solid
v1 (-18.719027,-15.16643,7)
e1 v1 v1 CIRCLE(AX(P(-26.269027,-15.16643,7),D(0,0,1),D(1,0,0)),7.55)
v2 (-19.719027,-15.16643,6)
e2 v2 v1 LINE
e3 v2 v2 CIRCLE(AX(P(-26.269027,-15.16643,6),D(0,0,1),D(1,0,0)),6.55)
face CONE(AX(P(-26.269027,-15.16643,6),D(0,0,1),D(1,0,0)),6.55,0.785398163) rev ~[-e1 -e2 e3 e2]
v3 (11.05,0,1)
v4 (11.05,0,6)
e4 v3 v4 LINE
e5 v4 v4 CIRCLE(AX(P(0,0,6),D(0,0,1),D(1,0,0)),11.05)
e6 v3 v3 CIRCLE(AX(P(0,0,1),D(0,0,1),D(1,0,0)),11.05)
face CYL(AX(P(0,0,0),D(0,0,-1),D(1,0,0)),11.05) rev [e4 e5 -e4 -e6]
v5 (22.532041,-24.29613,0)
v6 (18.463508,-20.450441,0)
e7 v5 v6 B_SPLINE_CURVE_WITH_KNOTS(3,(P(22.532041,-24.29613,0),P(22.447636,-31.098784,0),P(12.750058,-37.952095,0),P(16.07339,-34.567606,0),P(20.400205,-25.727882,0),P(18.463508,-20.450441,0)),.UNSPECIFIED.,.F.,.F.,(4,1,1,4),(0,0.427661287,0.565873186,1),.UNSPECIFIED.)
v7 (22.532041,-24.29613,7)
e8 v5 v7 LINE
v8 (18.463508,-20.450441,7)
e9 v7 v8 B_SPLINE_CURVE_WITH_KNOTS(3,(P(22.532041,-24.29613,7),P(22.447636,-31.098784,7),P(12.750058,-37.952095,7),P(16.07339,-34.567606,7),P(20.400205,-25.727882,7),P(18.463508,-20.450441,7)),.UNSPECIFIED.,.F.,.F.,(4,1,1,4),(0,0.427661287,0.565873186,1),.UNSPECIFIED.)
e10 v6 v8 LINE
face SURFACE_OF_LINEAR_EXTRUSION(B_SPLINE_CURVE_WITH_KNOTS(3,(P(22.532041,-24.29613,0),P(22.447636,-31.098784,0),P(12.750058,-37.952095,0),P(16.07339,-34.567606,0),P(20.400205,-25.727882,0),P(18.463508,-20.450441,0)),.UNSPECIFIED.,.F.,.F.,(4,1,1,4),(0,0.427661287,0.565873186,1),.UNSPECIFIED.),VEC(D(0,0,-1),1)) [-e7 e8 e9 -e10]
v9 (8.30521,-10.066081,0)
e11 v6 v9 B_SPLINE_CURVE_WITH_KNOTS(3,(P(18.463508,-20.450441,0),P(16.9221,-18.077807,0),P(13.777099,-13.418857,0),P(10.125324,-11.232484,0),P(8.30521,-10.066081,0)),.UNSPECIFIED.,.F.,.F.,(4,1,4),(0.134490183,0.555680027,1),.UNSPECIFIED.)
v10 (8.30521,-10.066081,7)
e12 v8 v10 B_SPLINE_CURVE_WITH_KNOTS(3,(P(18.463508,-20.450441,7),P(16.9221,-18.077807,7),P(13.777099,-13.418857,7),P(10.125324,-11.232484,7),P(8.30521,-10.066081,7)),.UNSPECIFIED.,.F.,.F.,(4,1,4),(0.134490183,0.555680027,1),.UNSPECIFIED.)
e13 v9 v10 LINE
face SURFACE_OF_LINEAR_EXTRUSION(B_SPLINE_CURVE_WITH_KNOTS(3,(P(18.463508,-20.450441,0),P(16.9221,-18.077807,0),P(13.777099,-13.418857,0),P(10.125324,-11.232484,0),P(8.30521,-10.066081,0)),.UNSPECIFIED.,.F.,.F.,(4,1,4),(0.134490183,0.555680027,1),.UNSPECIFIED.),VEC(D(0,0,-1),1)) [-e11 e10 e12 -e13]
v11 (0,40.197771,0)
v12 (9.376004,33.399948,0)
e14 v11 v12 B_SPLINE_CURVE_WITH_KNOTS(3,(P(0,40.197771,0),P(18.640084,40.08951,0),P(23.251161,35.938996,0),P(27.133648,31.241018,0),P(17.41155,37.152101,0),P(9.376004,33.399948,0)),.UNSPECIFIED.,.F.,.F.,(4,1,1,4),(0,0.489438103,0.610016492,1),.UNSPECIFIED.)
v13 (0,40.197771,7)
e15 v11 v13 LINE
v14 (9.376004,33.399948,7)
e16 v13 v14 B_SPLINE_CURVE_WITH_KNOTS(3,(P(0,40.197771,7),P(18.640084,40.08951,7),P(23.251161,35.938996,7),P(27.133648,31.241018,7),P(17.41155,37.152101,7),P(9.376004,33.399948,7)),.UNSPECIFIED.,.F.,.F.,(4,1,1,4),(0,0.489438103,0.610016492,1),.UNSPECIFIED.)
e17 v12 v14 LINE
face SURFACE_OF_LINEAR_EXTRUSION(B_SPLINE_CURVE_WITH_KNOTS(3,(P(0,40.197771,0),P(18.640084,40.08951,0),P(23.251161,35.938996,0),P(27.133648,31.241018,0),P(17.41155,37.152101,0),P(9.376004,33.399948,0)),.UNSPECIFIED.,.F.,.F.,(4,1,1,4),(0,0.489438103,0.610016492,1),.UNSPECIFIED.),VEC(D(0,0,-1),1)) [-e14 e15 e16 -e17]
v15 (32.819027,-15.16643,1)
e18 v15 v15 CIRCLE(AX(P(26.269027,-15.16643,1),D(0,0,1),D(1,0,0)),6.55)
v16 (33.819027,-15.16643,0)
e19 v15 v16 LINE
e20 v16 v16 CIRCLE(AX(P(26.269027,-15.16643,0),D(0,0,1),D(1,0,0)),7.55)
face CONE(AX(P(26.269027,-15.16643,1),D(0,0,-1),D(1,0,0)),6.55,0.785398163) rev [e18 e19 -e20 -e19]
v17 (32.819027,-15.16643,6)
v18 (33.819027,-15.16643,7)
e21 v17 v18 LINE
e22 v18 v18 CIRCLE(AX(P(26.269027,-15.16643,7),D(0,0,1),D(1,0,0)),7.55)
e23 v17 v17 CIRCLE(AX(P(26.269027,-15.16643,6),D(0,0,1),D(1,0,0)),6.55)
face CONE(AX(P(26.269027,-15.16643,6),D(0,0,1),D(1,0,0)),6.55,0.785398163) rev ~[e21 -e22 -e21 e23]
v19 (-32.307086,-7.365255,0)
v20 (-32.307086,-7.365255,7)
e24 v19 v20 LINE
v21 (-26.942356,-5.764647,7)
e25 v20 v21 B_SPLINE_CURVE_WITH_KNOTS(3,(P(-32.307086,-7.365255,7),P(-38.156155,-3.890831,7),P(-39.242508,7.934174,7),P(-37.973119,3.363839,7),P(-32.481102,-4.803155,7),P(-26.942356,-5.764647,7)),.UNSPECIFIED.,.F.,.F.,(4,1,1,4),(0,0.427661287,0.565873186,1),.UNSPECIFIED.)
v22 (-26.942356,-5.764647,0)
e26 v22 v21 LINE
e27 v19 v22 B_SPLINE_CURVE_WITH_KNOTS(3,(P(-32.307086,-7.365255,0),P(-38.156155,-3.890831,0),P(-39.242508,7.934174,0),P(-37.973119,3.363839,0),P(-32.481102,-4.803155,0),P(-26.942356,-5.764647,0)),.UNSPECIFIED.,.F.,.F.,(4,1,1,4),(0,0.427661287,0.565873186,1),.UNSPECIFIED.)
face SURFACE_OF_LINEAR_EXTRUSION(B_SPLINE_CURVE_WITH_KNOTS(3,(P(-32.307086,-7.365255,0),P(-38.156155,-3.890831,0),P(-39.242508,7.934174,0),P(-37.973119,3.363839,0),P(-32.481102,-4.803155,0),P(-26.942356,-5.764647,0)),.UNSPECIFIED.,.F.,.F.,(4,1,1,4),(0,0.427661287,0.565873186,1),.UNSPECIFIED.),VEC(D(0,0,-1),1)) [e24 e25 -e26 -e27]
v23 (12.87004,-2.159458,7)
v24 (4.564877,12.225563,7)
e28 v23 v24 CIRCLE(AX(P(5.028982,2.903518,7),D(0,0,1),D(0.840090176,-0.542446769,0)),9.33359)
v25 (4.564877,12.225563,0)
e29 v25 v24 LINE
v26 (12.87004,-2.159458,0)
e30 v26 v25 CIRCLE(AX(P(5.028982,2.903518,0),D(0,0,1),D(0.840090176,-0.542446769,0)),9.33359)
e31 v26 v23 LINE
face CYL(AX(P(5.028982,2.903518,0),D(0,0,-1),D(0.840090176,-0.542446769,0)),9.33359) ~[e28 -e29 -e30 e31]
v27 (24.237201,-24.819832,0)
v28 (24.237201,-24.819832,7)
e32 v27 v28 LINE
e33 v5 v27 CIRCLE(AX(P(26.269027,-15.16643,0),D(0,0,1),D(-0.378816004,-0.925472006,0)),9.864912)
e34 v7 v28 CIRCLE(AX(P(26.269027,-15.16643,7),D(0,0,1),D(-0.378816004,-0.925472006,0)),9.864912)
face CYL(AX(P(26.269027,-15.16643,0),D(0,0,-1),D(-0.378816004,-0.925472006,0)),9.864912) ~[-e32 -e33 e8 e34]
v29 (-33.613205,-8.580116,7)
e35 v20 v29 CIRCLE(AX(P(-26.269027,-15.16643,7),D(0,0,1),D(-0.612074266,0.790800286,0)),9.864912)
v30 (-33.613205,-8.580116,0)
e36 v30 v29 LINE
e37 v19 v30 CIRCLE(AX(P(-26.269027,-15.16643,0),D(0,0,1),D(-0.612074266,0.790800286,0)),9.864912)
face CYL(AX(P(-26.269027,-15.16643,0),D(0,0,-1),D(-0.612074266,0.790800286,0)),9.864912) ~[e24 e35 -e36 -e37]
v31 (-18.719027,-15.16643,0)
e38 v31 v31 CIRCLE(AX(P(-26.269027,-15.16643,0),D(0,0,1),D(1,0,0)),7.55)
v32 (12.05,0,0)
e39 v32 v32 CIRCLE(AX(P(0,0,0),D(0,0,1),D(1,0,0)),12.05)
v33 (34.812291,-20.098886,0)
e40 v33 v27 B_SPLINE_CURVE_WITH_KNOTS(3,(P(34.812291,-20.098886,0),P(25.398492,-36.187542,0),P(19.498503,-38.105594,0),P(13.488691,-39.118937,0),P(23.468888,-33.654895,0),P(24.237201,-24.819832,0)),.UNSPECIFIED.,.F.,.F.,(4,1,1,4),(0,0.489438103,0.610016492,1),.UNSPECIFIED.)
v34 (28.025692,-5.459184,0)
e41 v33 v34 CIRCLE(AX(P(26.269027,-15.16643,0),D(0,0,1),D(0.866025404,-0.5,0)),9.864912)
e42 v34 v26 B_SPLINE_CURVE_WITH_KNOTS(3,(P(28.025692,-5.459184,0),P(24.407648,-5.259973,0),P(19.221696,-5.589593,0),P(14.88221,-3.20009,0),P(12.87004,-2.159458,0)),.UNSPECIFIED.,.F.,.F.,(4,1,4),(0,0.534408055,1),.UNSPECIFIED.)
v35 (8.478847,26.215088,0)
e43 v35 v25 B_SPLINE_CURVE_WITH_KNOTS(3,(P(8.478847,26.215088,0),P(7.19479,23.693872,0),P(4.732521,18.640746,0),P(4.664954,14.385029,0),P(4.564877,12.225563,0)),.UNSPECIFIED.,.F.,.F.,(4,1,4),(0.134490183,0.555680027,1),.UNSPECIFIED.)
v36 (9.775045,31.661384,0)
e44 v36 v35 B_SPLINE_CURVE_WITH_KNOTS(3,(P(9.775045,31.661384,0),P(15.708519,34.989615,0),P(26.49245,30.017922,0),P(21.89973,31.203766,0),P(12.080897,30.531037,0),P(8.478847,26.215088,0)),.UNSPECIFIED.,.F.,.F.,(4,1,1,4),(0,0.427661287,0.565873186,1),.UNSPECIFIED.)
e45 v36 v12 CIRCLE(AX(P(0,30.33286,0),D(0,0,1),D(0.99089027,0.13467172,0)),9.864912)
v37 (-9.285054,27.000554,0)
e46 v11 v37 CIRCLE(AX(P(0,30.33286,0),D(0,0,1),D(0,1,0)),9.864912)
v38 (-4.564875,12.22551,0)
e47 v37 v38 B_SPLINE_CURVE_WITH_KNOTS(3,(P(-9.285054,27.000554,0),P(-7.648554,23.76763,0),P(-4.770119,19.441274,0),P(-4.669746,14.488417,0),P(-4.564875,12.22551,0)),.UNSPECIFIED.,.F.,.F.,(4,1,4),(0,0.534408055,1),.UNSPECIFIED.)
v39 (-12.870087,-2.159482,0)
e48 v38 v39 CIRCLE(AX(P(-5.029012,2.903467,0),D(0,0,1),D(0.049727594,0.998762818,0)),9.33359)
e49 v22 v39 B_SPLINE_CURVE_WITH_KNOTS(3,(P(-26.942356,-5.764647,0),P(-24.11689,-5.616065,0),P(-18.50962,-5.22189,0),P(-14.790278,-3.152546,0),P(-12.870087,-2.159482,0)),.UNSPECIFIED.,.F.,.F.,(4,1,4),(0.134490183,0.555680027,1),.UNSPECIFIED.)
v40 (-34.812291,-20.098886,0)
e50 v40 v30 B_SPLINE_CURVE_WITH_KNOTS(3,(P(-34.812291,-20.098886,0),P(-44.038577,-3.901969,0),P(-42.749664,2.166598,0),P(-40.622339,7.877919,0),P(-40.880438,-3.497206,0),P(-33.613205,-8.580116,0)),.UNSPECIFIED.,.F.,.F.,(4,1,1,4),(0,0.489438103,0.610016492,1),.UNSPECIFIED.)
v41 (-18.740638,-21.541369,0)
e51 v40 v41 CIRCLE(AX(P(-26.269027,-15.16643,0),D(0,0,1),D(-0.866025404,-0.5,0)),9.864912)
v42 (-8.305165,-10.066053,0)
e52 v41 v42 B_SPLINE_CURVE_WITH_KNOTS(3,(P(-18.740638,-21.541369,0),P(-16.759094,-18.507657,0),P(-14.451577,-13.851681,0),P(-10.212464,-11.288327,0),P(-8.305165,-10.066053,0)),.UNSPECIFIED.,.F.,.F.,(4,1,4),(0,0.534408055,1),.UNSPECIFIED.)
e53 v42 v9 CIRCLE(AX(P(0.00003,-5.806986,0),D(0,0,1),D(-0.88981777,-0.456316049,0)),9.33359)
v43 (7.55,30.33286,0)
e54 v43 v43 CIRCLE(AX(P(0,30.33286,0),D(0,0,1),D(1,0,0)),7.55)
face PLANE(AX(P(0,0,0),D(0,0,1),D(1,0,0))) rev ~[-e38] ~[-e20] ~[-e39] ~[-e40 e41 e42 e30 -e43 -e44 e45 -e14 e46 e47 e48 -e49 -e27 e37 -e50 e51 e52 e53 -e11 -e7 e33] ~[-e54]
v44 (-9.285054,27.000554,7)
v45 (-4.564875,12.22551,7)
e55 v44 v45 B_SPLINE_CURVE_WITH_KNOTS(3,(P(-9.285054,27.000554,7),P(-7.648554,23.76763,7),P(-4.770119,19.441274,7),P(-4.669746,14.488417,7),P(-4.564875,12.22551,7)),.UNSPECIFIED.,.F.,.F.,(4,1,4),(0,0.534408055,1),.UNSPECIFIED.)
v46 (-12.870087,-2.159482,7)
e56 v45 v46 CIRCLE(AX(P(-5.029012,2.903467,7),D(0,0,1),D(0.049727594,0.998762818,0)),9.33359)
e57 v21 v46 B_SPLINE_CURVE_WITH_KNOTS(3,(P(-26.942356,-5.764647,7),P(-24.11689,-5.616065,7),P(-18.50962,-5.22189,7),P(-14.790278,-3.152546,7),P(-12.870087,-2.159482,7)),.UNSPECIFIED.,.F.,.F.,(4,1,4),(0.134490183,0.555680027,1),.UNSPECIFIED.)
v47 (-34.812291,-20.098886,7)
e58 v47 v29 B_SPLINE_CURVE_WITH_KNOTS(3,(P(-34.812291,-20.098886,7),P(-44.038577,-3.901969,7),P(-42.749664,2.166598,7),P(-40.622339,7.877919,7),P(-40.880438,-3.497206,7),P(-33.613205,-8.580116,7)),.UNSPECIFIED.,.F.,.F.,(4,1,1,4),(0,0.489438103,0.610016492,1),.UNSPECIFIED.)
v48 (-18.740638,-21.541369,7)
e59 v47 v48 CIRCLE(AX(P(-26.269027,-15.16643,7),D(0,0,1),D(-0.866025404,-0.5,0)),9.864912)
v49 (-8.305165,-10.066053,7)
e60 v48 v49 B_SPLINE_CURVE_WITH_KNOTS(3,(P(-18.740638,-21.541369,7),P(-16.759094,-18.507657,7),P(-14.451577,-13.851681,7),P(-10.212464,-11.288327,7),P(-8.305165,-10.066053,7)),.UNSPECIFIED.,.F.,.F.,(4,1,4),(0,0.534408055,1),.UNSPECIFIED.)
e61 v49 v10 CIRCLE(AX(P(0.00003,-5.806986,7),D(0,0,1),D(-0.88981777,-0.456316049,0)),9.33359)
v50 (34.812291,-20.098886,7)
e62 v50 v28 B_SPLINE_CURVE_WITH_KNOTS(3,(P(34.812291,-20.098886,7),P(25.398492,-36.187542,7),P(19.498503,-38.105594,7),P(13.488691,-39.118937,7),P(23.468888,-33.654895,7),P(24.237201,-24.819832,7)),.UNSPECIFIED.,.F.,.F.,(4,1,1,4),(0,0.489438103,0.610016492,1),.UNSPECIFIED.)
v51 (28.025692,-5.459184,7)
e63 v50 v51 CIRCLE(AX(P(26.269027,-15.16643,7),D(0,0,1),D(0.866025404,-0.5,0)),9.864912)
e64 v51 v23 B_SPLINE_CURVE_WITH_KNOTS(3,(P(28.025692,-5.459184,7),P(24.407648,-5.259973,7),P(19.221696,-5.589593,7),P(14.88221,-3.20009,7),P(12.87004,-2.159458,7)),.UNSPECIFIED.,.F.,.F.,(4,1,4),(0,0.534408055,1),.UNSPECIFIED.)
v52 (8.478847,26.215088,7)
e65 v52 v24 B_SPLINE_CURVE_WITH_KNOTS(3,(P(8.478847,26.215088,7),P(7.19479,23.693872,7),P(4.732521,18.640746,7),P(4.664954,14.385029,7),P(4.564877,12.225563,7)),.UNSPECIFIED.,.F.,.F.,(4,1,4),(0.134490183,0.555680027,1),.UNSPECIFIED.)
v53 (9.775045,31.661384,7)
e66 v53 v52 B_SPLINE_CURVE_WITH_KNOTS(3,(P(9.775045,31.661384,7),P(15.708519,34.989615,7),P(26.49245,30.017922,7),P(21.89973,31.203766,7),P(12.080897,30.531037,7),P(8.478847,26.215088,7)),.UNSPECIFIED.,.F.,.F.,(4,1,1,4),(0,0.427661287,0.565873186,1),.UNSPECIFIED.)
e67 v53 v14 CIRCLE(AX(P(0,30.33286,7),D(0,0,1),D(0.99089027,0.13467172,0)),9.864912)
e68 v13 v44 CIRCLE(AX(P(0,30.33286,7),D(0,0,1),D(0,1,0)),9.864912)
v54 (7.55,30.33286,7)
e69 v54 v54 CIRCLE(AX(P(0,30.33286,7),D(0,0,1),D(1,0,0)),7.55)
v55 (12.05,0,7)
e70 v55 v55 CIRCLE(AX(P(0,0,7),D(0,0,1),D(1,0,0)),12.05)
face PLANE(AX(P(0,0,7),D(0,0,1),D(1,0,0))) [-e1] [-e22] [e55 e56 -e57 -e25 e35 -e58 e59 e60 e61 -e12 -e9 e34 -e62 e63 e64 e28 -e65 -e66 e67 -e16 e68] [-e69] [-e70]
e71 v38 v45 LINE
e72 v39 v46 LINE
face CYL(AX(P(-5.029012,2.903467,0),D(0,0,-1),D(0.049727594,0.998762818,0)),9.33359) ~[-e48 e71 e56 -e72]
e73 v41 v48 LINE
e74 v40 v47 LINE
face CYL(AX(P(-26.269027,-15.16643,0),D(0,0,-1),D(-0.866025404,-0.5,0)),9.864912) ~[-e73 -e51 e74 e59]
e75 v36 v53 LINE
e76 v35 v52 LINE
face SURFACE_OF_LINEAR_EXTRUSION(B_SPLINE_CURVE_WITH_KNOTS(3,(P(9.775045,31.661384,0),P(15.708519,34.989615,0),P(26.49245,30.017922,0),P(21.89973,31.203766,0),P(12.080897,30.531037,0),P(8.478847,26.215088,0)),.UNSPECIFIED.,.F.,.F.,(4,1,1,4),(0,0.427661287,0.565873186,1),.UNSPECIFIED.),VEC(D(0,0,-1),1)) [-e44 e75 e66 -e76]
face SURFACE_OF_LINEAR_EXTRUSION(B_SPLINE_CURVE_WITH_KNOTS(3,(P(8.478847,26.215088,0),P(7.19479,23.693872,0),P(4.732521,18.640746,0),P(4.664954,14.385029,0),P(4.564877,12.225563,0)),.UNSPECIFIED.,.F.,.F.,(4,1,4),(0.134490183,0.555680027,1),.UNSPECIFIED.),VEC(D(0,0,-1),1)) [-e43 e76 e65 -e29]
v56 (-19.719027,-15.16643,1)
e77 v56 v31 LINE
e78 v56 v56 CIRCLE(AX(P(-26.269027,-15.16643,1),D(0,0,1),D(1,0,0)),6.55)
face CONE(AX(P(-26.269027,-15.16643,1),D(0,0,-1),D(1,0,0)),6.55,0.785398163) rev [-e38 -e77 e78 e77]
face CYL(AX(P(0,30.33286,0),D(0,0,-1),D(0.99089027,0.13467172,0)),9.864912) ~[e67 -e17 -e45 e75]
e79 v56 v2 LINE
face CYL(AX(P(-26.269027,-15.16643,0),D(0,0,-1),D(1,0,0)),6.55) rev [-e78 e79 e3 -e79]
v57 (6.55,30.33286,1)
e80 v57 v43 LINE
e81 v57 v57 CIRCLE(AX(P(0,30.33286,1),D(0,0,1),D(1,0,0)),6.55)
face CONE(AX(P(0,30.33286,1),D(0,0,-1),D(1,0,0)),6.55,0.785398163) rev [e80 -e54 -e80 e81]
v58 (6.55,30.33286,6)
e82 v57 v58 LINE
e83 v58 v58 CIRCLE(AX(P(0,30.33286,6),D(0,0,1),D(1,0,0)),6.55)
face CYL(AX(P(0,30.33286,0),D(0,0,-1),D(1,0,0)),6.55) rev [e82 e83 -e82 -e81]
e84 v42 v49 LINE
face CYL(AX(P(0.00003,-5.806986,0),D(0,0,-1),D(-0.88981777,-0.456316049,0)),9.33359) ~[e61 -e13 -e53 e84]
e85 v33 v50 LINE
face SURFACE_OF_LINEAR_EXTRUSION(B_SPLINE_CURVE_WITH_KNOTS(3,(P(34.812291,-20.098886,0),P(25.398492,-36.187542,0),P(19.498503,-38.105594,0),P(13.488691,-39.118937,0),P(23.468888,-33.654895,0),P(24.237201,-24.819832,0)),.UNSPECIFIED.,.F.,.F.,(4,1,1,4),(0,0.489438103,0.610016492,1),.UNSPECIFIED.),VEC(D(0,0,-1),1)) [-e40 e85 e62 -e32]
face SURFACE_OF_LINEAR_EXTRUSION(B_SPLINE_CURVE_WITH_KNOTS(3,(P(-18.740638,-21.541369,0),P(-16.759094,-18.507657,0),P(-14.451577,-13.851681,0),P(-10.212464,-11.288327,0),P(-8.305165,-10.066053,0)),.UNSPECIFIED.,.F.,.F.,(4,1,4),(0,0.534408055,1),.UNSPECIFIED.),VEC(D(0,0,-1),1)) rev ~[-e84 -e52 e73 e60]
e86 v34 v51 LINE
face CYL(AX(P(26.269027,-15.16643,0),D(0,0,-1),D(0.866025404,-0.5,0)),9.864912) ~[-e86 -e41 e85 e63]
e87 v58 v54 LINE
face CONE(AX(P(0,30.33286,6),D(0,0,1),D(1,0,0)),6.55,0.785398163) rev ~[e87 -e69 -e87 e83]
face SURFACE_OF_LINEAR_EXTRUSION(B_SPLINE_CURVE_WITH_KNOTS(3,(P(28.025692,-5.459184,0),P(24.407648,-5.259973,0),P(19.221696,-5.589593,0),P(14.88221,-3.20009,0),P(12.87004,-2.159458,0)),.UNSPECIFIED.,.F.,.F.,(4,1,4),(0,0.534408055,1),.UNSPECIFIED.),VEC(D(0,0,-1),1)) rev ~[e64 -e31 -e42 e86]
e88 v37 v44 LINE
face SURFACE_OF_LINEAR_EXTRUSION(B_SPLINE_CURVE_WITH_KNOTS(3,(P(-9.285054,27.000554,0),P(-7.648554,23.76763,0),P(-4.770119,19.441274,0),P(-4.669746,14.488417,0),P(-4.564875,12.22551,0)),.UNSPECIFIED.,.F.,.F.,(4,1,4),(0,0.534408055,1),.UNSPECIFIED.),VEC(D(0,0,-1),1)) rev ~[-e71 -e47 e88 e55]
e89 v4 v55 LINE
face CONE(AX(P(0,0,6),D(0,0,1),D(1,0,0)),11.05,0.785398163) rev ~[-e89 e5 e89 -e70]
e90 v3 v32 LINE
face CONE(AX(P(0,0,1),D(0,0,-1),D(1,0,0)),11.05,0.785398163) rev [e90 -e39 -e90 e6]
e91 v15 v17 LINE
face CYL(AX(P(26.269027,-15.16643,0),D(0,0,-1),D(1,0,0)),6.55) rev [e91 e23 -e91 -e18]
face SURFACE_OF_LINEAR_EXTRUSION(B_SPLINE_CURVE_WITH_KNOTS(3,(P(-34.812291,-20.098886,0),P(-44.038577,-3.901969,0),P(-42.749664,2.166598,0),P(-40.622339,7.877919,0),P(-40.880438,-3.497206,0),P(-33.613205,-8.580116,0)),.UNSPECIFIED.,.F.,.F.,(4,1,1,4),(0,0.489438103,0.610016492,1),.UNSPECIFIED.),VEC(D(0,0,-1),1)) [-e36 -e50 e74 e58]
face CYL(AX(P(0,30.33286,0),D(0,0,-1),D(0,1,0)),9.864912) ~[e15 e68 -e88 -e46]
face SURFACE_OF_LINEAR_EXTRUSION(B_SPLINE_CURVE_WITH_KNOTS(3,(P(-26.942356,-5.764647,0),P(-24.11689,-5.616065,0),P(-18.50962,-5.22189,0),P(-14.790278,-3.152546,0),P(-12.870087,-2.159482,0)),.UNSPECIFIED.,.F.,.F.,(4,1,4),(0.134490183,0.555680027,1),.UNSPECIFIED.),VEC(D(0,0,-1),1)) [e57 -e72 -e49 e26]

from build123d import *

# Parameters (mm, degrees)
F0_R     = 6.55
F0_R_2   = 11.05
F1_DEPTH = 7
F2_SIZE  = 1


# Not quite as in the source:
# - ends of sketch curves that miss each other by under 0.0002 mm in the source are joined


with BuildPart() as f1:
    # F0 (on Top) → F1 (new body)
    with BuildSketch(Plane.XY):
        with BuildLine():
            ThreePointArc((0, 40.1977714043), (-8.0681283552, 36.0092836242), (-9.2850536357, 27.0005535305))
            add(Edge.make_bspline(
                [(-9.2850536357, 27.0005535305), (-7.6485537074, 23.76762968), (-4.7701185707, 19.4412735204), (-4.6697456794, 14.4884170356), (-4.5648748072, 12.2255101831)],
                knots=[0, 0, 0, 0, 0.5344080552, 1, 1, 1, 1], degree=3))
            ThreePointArc((-4.5648748072, 12.2255101831), (-13.112130235, 7.5702762234), (-12.8700869391, -2.1594819242))
            add(Edge.make_bspline(
                [(-26.9423555096, -5.7646466266), (-24.1168902387, -5.6160652927), (-18.509620442, -5.2218898403), (-14.7902779868, -3.1525456922), (-12.8700869391, -2.1594819242)],
                knots=[0.1344901828, 0.1344901828, 0.1344901828, 0.1344901828, 0.5556800273, 1, 1, 1, 1], degree=3))
            add(Edge.make_bspline(
                [(-32.3070856345, -7.3652547262), (-38.1561546686, -3.8908306821), (-39.2425077068, 7.9341737596), (-37.973119311, 3.3638390897), (-32.4811016658, -4.8031550223), (-26.9423555096, -5.7646466266)],
                knots=[0, 0, 0, 0, 0.4276612867, 0.5658731858, 1, 1, 1, 1], degree=3))
            ThreePointArc((-32.3070856345, -7.3652547262), (-32.9876607035, -7.9431032983), (-33.6132053721, -8.5801160647))
            add(Edge.make_bspline(
                [(-34.8122912116, -20.0988857021), (-44.0385765115, -3.9019687515), (-42.749663868, 2.1665983757), (-40.6223387742, 7.8779194346), (-40.8804383129, -3.4972060171), (-33.6132053721, -8.5801160647)],
                knots=[0, 0, 0, 0, 0.4894381035, 0.610016492, 1, 1, 1, 1], degree=3))
            ThreePointArc((-34.8122912116, -20.0988857021), (-27.150890213, -24.9918459287), (-18.7406384558, -21.5413690893))
            add(Edge.make_bspline(
                [(-18.7406384558, -21.5413690893), (-16.7590942369, -18.5076566528), (-14.4515774653, -13.8516806215), (-10.2124643737, -11.2883269054), (-8.3051649892, -10.0660526397)],
                knots=[0, 0, 0, 0, 0.5344080552, 1, 1, 1, 1], degree=3))
            ThreePointArc((-8.3051649892, -10.0660526397), (1.35944e-05, -15.1405759929), (8.3052096749, -10.0660812761))
            add(Edge.make_bspline(
                [(18.4635081773, -20.4504409958), (16.9221003321, -18.0778069606), (13.7770994784, -13.4188565971), (10.1253236494, -11.2324836195), (8.3052096749, -10.0660812761)],
                knots=[0.1344901828, 0.1344901828, 0.1344901828, 0.1344901828, 0.5556800273, 1, 1, 1, 1], degree=3))
            add(Edge.make_bspline(
                [(22.5320405154, -24.2961295186), (22.4476355468, -31.0987839127), (12.7500578195, -37.9520954621), (16.0733895496, -34.5676055291), (20.4002051005, -25.7278816743), (18.4635081773, -20.4504409958)],
                knots=[0, 0, 0, 0, 0.4276612867, 0.5658731858, 1, 1, 1, 1], degree=3))
            ThreePointArc((22.5320405154, -24.2961295186), (23.3727595929, -24.5966005315), (24.2372011654, -24.8198317225))
            add(Edge.make_bspline(
                [(34.8122912116, -20.0988857021), (25.3984923193, -36.1875416297), (19.4985027008, -38.1055941008), (13.4886910278, -39.1189370569), (23.4688884096, -33.6548950882), (24.2372011654, -24.8198317225)],
                knots=[0, 0, 0, 0, 0.4894381035, 0.610016492, 1, 1, 1, 1], degree=3))
            ThreePointArc((34.8122912116, -20.0988857021), (35.2190185683, -11.0174376955), (28.0256920915, -5.4591844412))
            add(Edge.make_bspline(
                [(28.0256920915, -5.4591844412), (24.4076479443, -5.2599730272), (19.221696036, -5.5895928989), (14.8822100532, -3.2000901302), (12.8700397964, -2.1594575434)],
                knots=[0, 0, 0, 0, 0.5344080552, 1, 1, 1, 1], degree=3))
            ThreePointArc((12.8700397964, -2.1594575434), (13.1121166406, 7.5702997695), (4.5648772642, 12.2255632002))
            add(Edge.make_bspline(
                [(8.4788473323, 26.2150876224), (7.1947899065, 23.6938722533), (4.7325209636, 18.6407464373), (4.6649543374, 14.3850293117), (4.5648772642, 12.2255632002)],
                knots=[0.1344901828, 0.1344901828, 0.1344901828, 0.1344901828, 0.5556800273, 1, 1, 1, 1], degree=3))
            add(Edge.make_bspline(
                [(9.775045119, 31.6613842448), (15.7085191218, 34.9896145947), (26.4924498873, 30.0179217024), (21.8997297614, 31.2037664394), (12.0808965652, 30.5310366966), (8.4788473323, 26.2150876224)],
                knots=[0, 0, 0, 0, 0.4276612867, 0.5658731858, 1, 1, 1, 1], degree=3))
            ThreePointArc((9.775045119, 31.6613842448), (9.6149011106, 32.5397038298), (9.3760042066, 33.3999477872))
            add(Edge.make_bspline(
                [(0, 40.1977714043), (18.6400841922, 40.0895103812), (23.2511611671, 35.9389957251), (27.1336477464, 31.2410176223), (17.4115499033, 37.1521011054), (9.3760042066, 33.3999477872)],
                knots=[0, 0, 0, 0, 0.4894381035, 0.610016492, 1, 1, 1, 1], degree=3))
        make_face()
        with Locations((-26.2690269878, -15.1664298028)):
            Circle(F0_R, mode=Mode.SUBTRACT)
        Circle(F0_R_2, mode=Mode.SUBTRACT)
        with Locations((26.2690269878, -15.1664298028)):
            Circle(F0_R, mode=Mode.SUBTRACT)
        with Locations((0, 30.3328596056)):
            Circle(F0_R, mode=Mode.SUBTRACT)
    extrude(amount=F1_DEPTH)

    # F2
    f2_edges = [f1.edges().sort_by_distance(p)[0] for p in [
        (-11.05, 0, 0),
        (19.719027, -15.16643, 0),
        (-6.55, 30.33286, 0),
        (-32.819027, -15.16643, 0),
        (-6.55, 30.33286, 7),
        (-32.819027, -15.16643, 7),
        (11.05, 0, 3.5),
        (-11.05, 0, 7),
        (19.719027, -15.16643, 7),
    ]]
    chamfer(f2_edges, length=F2_SIZE)


solid = f1.part
